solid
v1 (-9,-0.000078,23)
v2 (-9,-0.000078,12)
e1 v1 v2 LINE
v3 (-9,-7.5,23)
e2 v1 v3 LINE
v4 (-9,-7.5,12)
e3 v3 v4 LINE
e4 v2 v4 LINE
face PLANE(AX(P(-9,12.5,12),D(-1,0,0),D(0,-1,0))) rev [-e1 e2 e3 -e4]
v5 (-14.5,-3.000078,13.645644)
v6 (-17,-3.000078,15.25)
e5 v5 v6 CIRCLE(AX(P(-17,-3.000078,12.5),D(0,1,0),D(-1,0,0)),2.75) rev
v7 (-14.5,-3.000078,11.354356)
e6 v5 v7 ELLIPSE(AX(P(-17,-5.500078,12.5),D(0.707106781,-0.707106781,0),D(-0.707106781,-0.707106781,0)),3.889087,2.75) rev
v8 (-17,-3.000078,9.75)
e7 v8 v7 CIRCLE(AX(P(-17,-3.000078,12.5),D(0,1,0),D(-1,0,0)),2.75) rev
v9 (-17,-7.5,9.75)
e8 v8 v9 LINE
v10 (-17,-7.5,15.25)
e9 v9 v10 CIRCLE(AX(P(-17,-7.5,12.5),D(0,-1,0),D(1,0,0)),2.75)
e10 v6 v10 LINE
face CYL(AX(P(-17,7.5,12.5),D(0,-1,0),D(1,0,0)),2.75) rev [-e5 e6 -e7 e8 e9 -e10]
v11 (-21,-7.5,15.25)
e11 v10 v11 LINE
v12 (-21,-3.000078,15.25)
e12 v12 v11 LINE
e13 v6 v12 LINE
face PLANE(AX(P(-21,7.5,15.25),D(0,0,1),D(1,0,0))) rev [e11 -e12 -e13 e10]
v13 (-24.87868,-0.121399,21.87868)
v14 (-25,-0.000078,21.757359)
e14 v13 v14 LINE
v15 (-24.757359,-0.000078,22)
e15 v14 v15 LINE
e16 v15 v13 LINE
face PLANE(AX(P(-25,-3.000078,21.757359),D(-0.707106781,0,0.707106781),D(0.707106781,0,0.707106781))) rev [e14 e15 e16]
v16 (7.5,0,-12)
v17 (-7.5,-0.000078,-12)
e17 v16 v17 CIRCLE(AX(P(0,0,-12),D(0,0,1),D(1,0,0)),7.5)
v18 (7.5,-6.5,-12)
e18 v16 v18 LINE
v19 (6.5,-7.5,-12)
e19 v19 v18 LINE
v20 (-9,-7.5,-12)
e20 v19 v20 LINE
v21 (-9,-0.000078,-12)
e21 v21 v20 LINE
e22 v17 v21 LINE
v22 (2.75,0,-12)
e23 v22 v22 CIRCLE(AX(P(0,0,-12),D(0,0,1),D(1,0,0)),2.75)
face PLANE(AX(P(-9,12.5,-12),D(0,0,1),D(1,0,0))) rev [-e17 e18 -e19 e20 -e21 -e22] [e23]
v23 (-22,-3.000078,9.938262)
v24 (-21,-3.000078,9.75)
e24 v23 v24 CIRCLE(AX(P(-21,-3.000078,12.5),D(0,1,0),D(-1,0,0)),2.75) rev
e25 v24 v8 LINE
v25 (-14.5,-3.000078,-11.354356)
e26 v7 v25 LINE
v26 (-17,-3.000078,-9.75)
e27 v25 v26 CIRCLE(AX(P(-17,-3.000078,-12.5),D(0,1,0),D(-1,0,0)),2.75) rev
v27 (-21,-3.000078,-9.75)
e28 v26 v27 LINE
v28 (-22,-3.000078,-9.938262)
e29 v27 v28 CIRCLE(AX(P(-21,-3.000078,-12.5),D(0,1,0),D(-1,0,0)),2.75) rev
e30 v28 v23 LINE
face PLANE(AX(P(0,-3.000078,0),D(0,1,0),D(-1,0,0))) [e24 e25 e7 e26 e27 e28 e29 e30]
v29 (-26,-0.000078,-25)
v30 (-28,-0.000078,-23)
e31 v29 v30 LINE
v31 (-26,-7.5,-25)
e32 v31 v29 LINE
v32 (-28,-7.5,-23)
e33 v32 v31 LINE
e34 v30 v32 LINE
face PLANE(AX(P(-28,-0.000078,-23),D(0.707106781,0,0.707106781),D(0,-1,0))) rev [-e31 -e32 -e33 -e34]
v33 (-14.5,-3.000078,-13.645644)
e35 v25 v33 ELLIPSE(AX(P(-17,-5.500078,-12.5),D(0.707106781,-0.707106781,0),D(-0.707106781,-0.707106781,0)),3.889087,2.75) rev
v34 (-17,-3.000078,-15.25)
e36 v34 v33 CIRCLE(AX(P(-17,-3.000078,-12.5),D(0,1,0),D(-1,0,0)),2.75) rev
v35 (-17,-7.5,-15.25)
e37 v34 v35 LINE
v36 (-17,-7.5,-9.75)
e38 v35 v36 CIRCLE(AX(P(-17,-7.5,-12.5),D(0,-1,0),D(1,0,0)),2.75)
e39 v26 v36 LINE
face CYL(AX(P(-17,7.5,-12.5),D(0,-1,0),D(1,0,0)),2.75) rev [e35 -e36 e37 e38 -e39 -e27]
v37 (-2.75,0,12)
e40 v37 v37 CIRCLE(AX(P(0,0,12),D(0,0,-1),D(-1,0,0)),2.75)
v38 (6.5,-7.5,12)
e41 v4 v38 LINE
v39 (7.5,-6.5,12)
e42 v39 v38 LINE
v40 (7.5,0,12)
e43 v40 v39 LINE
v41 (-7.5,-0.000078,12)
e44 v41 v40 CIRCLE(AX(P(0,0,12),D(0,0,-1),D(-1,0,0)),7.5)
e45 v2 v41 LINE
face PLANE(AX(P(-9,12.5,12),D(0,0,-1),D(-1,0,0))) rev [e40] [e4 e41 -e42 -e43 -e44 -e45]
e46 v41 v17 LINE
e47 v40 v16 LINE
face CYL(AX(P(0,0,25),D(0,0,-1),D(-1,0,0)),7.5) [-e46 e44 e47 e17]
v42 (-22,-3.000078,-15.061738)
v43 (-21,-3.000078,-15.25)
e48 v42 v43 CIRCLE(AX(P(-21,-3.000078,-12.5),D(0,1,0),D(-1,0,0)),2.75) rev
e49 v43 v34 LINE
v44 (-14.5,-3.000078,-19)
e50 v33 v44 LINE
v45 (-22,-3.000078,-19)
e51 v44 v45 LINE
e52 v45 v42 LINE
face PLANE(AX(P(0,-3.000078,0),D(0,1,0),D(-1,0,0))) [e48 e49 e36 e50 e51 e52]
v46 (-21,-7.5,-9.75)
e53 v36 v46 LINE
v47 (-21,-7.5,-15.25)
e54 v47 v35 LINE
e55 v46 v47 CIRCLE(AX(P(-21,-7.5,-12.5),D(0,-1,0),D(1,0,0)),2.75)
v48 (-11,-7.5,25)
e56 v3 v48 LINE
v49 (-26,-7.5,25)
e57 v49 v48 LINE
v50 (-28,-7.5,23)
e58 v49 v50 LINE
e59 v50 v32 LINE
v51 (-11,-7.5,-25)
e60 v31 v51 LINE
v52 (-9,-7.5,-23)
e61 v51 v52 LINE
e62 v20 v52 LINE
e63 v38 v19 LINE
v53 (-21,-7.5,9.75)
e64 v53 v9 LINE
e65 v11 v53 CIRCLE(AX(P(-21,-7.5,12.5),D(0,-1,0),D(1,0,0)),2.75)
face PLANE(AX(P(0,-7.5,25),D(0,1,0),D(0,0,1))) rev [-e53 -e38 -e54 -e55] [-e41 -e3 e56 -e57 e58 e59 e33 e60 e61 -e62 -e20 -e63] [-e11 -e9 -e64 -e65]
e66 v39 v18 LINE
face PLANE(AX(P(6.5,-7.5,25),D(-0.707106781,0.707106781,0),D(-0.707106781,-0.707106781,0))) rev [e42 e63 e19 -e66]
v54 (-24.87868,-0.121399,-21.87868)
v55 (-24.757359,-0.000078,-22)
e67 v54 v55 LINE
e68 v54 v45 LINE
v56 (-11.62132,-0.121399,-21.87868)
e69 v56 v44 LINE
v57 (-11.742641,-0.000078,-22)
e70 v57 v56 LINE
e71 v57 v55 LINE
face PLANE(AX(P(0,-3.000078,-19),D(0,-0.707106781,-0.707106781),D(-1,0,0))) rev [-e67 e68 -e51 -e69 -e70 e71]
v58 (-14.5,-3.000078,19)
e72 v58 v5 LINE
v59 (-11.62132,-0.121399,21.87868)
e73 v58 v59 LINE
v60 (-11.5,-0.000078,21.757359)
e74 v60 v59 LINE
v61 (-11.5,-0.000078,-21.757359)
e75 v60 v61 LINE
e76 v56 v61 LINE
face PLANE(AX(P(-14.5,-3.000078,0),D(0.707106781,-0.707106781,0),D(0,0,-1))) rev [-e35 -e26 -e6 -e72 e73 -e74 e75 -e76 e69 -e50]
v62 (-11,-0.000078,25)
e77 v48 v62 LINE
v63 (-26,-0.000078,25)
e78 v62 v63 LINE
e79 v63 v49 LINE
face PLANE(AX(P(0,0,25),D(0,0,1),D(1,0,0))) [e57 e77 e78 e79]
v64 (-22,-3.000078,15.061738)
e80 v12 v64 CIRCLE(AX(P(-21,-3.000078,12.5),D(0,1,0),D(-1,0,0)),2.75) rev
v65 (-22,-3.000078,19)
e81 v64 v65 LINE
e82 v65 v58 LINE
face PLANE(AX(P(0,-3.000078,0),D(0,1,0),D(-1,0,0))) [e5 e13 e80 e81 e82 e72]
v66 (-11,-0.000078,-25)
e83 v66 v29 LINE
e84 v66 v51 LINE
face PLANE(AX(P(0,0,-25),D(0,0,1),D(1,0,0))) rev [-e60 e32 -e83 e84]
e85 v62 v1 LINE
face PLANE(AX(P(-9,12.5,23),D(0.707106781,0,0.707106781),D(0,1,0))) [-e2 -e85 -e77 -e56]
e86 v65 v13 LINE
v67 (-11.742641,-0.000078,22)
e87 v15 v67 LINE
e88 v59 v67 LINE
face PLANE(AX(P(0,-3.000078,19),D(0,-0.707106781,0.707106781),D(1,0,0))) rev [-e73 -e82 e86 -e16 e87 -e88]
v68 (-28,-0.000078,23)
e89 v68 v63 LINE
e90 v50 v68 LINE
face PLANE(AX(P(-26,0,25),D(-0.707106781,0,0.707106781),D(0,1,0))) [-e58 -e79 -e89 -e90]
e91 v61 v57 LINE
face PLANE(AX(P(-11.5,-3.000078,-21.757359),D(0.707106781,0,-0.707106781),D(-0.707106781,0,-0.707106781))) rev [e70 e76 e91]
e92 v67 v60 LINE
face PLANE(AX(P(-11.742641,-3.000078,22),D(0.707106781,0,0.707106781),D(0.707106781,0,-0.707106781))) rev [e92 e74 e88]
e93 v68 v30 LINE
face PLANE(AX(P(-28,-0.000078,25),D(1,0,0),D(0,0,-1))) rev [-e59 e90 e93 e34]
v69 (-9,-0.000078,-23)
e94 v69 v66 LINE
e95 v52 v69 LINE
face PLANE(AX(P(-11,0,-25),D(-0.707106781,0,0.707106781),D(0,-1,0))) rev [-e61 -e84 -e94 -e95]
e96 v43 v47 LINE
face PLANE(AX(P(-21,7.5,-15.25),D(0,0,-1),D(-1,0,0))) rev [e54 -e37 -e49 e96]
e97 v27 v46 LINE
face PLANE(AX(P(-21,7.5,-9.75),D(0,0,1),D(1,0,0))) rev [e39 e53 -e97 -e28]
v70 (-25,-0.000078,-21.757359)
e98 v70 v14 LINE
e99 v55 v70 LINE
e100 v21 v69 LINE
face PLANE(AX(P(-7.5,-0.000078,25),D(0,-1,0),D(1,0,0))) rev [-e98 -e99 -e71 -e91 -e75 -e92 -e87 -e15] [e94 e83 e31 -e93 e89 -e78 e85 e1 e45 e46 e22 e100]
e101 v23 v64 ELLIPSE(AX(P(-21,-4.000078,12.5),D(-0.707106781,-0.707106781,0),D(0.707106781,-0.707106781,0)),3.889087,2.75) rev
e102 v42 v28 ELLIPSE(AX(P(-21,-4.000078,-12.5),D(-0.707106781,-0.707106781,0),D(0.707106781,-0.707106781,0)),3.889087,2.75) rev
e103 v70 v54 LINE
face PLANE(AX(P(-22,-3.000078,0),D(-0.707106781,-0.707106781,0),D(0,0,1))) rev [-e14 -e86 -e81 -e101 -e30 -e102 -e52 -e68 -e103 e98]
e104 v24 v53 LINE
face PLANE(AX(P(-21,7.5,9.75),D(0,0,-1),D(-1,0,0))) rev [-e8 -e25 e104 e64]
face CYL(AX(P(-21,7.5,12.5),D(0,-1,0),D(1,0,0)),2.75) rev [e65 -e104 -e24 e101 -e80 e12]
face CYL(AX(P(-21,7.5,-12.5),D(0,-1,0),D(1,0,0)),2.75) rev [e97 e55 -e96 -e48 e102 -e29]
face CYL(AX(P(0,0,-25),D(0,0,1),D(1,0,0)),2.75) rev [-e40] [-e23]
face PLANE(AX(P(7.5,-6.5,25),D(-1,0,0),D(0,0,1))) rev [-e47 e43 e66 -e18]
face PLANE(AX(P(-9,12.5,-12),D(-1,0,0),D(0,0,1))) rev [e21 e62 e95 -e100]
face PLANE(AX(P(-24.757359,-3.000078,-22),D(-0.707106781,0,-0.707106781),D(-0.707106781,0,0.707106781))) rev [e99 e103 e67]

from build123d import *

# Parameters (mm, degrees)
BOSS_EXTRUDE1_DEPTH = 25
MOUNT_HOLES_DEPTH   = 41.422765863
SKETCH7_W           = 16.5
SKETCH7_H           = 13
CUT_PART_DEPTH      = 20
SKETCH10_R          = 2.75
CUT_EXTRUDE3_DEPTH  = 25
CHAMFER1_SIZE       = 2
CUT_EXTRUDE4_DEPTH  = 3
CHAMFER2_SIZE       = 3


with BuildPart() as part:
    # contour → Boss-Extrude1 (new, symmetric)
    with BuildSketch(Plane.XY):
        with BuildLine():
            Line((0, -7.5), (6.5, -7.5))
            Line((6.5, -7.5), (7.5, -6.5))
            Line((7.5, -6.5), (7.5, 0))
            ThreePointArc((7.5, 0), (-3.9135e-05, 7.5), (-7.5, -7.827e-05))
            Line((-7.5, -7.827e-05), (-28, -7.827e-05))
            Line((-28, -7.827e-05), (-28, -7.5))
            Line((-28, -7.5), (0, -7.5))
        make_face()
    extrude(amount=BOSS_EXTRUDE1_DEPTH, both=True)

    # Sketch6 → mount-holes (cut, through all)
    with BuildSketch(Plane.XZ.offset(7.5)):
        with BuildLine():
            Line((-21, 15.25), (-17, 15.25))
            ThreePointArc((-17, 15.25), (-14.25, 12.5), (-17, 9.75))
            Line((-17, 9.75), (-21, 9.75))
            ThreePointArc((-21, 9.75), (-23.75, 12.5), (-21, 15.25))
        make_face()
        with BuildLine():
            Line((-21, -9.75), (-17, -9.75))
            ThreePointArc((-17, -9.75), (-14.25, -12.5), (-17, -15.25))
            Line((-17, -15.25), (-21, -15.25))
            ThreePointArc((-21, -15.25), (-23.75, -12.5), (-21, -9.75))
        make_face()
    extrude(amount=-MOUNT_HOLES_DEPTH, mode=Mode.SUBTRACT)

    # Sketch7 → cut-part (cut)
    with BuildSketch(Plane.XZ.offset(7.5)):
        with Locations((-0.75, 18.5)):
            Rectangle(SKETCH7_W, SKETCH7_H)
        with Locations((-0.75, -18.5)):
            Rectangle(SKETCH7_W, SKETCH7_H)
    extrude(amount=-CUT_PART_DEPTH, mode=Mode.SUBTRACT)

    # Sketch10 → Cut-Extrude3 (cut, symmetric)
    with BuildSketch(Plane.XY):
        Circle(SKETCH10_R)
    extrude(amount=CUT_EXTRUDE3_DEPTH, both=True, mode=Mode.SUBTRACT)

    # Chamfer1
    chamfer1_edges = [part.edges().sort_by_distance(p)[0] for p in [
        (-28, -3.750039135, 25),
        (-9, -3.750039135, 25),
        (-28, -3.750039135, -25),
        (-9, -3.750039135, -25),
    ]]
    chamfer(chamfer1_edges, length=CHAMFER1_SIZE)

    # Sketch11 → Cut-Extrude4 (cut)
    with BuildSketch(Plane(origin=(0, -7.827e-05, 0), x_dir=(1, 0, 0), z_dir=(0, 1, 0))):
        Polygon((-11.5, -21.757359313), (-11.5, 21.757359313), (-11.742640687, 22), (-24.757359313, 22), (-25, 21.757359313), (-25, -21.757359313), (-24.757359313, -22), (-11.742640687, -22), align=None)
    extrude(amount=-CUT_EXTRUDE4_DEPTH, mode=Mode.SUBTRACT)

    # Chamfer2
    # the kernel refuses this chamfer: 3 mm, written as the material it adds along each edge
    with BuildSketch(Plane(origin=(-11.5, -3.00007827, 29.472408277), x_dir=(0.027495876610585626, 0.9996219169112968, 0), z_dir=(0, 0, -1))) as chamfer2_piece_1_section:
        Polygon((CHAMFER2_SIZE * 0.999621916911, -CHAMFER2_SIZE * 0.0274958766106), (-CHAMFER2_SIZE * 0.0274958766106, -CHAMFER2_SIZE * 0.999621916911), (0, 0), align=None)
    chamfer2_piece_1 = extrude(amount=58.944816554, mode=Mode.PRIVATE)
    chamfer2_piece_1 = split(chamfer2_piece_1, bisect_by=Plane(origin=(-12.500072931, -2.000114735, -22), z_dir=(0, 0, 1)), keep=Keep.TOP, mode=Mode.PRIVATE)
    chamfer2_piece_1 = split(chamfer2_piece_1, bisect_by=Plane(origin=(-1.121356809, -2.000114735, 11.378716122), z_dir=(-0.7071067811865476, 0, -0.7071067811865476)), keep=Keep.TOP, mode=Mode.PRIVATE)
    chamfer2_piece_1 = chamfer2_piece_1 - Plane(origin=(-17, -2.000114735, -12.5), x_dir=(0, 0, 1), z_dir=(0, -1, 0)) * Cylinder(2.75, 130, mode=Mode.PRIVATE)
    chamfer2_piece_1 = chamfer2_piece_1 - Plane(origin=(-17, -2.000114735, 12.5), x_dir=(0, 0, 1), z_dir=(0, -1, 0)) * Cylinder(2.75, 130, mode=Mode.PRIVATE)
    add(chamfer2_piece_1)
    with BuildSketch(Plane(origin=(-32.472408277, -3.00007827, 22), x_dir=(0, 0.9996219169112968, 0.027495876610586778), z_dir=(1, 0, 0))) as chamfer2_piece_2_section:
        Polygon((CHAMFER2_SIZE * 0.999621916911, -CHAMFER2_SIZE * 0.0274958766106), (-CHAMFER2_SIZE * 0.0274958766106, -CHAMFER2_SIZE * 0.999621916911), (0, 0), align=None)
    chamfer2_piece_2 = extrude(amount=28.444816553, mode=Mode.PRIVATE)
    chamfer2_piece_2 = split(chamfer2_piece_2, bisect_by=Plane(origin=(-11.5, -2.001383642, 20.997389255), z_dir=(-1, 0, 0)), keep=Keep.TOP, mode=Mode.PRIVATE)
    chamfer2_piece_2 = split(chamfer2_piece_2, bisect_by=Plane(origin=(-22.004985029, -2.001383642, 24.752374284), z_dir=(0.7071067811865527, 0, -0.7071067811865424)), keep=Keep.TOP, mode=Mode.PRIVATE)
    add(chamfer2_piece_2)
    with BuildSketch(Plane(origin=(-25, -3.00007827, -29.472408277), x_dir=(-0.027495876610586778, 0.9996219169112968, 0), z_dir=(0, 0, 1))) as chamfer2_piece_3_section:
        Polygon((CHAMFER2_SIZE * 0.999621916911, -CHAMFER2_SIZE * 0.0274958766106), (-CHAMFER2_SIZE * 0.0274958766106, -CHAMFER2_SIZE * 0.999621916911), (0, 0), align=None)
    chamfer2_piece_3 = extrude(amount=58.944816554, mode=Mode.PRIVATE)
    chamfer2_piece_3 = split(chamfer2_piece_3, bisect_by=Plane(origin=(-35.402787978, -1.975969948, -11.354571334), z_dir=(0.7071067811865527, 0, 0.7071067811865424)), keep=Keep.TOP, mode=Mode.PRIVATE)
    chamfer2_piece_3 = split(chamfer2_piece_3, bisect_by=Plane(origin=(-24.048216644, -1.975969948, 22), z_dir=(0, 0, -1)), keep=Keep.TOP, mode=Mode.PRIVATE)
    chamfer2_piece_3 = chamfer2_piece_3 - Plane(origin=(-21, -1.975969948, -12.5), x_dir=(0, 0, -1), z_dir=(0, -1, 0)) * Cylinder(2.75, 130, mode=Mode.PRIVATE)
    chamfer2_piece_3 = chamfer2_piece_3 - Plane(origin=(-21, -1.975969948, 12.5), x_dir=(0, 0, -1), z_dir=(0, -1, 0)) * Cylinder(2.75, 130, mode=Mode.PRIVATE)
    add(chamfer2_piece_3)
    with BuildSketch(Plane(origin=(-4.027591723, -3.00007827, -22), x_dir=(0, 0.9996219169112968, -0.027495876610586778), z_dir=(-1, 0, 0))) as chamfer2_piece_4_section:
        Polygon((CHAMFER2_SIZE * 0.999621916911, -CHAMFER2_SIZE * 0.0274958766106), (-CHAMFER2_SIZE * 0.0274958766106, -CHAMFER2_SIZE * 0.999621916911), (0, 0), align=None)
    chamfer2_piece_4 = extrude(amount=28.444816553, mode=Mode.PRIVATE)
    chamfer2_piece_4 = split(chamfer2_piece_4, bisect_by=Plane(origin=(-11.5, -2.001383642, -20.997389255), z_dir=(-1, 0, 0)), keep=Keep.TOP, mode=Mode.PRIVATE)
    chamfer2_piece_4 = split(chamfer2_piece_4, bisect_by=Plane(origin=(-25, -2.001383642, -20.997389255), z_dir=(1, 0, 0)), keep=Keep.TOP, mode=Mode.PRIVATE)
    add(chamfer2_piece_4)


solid = part.part
